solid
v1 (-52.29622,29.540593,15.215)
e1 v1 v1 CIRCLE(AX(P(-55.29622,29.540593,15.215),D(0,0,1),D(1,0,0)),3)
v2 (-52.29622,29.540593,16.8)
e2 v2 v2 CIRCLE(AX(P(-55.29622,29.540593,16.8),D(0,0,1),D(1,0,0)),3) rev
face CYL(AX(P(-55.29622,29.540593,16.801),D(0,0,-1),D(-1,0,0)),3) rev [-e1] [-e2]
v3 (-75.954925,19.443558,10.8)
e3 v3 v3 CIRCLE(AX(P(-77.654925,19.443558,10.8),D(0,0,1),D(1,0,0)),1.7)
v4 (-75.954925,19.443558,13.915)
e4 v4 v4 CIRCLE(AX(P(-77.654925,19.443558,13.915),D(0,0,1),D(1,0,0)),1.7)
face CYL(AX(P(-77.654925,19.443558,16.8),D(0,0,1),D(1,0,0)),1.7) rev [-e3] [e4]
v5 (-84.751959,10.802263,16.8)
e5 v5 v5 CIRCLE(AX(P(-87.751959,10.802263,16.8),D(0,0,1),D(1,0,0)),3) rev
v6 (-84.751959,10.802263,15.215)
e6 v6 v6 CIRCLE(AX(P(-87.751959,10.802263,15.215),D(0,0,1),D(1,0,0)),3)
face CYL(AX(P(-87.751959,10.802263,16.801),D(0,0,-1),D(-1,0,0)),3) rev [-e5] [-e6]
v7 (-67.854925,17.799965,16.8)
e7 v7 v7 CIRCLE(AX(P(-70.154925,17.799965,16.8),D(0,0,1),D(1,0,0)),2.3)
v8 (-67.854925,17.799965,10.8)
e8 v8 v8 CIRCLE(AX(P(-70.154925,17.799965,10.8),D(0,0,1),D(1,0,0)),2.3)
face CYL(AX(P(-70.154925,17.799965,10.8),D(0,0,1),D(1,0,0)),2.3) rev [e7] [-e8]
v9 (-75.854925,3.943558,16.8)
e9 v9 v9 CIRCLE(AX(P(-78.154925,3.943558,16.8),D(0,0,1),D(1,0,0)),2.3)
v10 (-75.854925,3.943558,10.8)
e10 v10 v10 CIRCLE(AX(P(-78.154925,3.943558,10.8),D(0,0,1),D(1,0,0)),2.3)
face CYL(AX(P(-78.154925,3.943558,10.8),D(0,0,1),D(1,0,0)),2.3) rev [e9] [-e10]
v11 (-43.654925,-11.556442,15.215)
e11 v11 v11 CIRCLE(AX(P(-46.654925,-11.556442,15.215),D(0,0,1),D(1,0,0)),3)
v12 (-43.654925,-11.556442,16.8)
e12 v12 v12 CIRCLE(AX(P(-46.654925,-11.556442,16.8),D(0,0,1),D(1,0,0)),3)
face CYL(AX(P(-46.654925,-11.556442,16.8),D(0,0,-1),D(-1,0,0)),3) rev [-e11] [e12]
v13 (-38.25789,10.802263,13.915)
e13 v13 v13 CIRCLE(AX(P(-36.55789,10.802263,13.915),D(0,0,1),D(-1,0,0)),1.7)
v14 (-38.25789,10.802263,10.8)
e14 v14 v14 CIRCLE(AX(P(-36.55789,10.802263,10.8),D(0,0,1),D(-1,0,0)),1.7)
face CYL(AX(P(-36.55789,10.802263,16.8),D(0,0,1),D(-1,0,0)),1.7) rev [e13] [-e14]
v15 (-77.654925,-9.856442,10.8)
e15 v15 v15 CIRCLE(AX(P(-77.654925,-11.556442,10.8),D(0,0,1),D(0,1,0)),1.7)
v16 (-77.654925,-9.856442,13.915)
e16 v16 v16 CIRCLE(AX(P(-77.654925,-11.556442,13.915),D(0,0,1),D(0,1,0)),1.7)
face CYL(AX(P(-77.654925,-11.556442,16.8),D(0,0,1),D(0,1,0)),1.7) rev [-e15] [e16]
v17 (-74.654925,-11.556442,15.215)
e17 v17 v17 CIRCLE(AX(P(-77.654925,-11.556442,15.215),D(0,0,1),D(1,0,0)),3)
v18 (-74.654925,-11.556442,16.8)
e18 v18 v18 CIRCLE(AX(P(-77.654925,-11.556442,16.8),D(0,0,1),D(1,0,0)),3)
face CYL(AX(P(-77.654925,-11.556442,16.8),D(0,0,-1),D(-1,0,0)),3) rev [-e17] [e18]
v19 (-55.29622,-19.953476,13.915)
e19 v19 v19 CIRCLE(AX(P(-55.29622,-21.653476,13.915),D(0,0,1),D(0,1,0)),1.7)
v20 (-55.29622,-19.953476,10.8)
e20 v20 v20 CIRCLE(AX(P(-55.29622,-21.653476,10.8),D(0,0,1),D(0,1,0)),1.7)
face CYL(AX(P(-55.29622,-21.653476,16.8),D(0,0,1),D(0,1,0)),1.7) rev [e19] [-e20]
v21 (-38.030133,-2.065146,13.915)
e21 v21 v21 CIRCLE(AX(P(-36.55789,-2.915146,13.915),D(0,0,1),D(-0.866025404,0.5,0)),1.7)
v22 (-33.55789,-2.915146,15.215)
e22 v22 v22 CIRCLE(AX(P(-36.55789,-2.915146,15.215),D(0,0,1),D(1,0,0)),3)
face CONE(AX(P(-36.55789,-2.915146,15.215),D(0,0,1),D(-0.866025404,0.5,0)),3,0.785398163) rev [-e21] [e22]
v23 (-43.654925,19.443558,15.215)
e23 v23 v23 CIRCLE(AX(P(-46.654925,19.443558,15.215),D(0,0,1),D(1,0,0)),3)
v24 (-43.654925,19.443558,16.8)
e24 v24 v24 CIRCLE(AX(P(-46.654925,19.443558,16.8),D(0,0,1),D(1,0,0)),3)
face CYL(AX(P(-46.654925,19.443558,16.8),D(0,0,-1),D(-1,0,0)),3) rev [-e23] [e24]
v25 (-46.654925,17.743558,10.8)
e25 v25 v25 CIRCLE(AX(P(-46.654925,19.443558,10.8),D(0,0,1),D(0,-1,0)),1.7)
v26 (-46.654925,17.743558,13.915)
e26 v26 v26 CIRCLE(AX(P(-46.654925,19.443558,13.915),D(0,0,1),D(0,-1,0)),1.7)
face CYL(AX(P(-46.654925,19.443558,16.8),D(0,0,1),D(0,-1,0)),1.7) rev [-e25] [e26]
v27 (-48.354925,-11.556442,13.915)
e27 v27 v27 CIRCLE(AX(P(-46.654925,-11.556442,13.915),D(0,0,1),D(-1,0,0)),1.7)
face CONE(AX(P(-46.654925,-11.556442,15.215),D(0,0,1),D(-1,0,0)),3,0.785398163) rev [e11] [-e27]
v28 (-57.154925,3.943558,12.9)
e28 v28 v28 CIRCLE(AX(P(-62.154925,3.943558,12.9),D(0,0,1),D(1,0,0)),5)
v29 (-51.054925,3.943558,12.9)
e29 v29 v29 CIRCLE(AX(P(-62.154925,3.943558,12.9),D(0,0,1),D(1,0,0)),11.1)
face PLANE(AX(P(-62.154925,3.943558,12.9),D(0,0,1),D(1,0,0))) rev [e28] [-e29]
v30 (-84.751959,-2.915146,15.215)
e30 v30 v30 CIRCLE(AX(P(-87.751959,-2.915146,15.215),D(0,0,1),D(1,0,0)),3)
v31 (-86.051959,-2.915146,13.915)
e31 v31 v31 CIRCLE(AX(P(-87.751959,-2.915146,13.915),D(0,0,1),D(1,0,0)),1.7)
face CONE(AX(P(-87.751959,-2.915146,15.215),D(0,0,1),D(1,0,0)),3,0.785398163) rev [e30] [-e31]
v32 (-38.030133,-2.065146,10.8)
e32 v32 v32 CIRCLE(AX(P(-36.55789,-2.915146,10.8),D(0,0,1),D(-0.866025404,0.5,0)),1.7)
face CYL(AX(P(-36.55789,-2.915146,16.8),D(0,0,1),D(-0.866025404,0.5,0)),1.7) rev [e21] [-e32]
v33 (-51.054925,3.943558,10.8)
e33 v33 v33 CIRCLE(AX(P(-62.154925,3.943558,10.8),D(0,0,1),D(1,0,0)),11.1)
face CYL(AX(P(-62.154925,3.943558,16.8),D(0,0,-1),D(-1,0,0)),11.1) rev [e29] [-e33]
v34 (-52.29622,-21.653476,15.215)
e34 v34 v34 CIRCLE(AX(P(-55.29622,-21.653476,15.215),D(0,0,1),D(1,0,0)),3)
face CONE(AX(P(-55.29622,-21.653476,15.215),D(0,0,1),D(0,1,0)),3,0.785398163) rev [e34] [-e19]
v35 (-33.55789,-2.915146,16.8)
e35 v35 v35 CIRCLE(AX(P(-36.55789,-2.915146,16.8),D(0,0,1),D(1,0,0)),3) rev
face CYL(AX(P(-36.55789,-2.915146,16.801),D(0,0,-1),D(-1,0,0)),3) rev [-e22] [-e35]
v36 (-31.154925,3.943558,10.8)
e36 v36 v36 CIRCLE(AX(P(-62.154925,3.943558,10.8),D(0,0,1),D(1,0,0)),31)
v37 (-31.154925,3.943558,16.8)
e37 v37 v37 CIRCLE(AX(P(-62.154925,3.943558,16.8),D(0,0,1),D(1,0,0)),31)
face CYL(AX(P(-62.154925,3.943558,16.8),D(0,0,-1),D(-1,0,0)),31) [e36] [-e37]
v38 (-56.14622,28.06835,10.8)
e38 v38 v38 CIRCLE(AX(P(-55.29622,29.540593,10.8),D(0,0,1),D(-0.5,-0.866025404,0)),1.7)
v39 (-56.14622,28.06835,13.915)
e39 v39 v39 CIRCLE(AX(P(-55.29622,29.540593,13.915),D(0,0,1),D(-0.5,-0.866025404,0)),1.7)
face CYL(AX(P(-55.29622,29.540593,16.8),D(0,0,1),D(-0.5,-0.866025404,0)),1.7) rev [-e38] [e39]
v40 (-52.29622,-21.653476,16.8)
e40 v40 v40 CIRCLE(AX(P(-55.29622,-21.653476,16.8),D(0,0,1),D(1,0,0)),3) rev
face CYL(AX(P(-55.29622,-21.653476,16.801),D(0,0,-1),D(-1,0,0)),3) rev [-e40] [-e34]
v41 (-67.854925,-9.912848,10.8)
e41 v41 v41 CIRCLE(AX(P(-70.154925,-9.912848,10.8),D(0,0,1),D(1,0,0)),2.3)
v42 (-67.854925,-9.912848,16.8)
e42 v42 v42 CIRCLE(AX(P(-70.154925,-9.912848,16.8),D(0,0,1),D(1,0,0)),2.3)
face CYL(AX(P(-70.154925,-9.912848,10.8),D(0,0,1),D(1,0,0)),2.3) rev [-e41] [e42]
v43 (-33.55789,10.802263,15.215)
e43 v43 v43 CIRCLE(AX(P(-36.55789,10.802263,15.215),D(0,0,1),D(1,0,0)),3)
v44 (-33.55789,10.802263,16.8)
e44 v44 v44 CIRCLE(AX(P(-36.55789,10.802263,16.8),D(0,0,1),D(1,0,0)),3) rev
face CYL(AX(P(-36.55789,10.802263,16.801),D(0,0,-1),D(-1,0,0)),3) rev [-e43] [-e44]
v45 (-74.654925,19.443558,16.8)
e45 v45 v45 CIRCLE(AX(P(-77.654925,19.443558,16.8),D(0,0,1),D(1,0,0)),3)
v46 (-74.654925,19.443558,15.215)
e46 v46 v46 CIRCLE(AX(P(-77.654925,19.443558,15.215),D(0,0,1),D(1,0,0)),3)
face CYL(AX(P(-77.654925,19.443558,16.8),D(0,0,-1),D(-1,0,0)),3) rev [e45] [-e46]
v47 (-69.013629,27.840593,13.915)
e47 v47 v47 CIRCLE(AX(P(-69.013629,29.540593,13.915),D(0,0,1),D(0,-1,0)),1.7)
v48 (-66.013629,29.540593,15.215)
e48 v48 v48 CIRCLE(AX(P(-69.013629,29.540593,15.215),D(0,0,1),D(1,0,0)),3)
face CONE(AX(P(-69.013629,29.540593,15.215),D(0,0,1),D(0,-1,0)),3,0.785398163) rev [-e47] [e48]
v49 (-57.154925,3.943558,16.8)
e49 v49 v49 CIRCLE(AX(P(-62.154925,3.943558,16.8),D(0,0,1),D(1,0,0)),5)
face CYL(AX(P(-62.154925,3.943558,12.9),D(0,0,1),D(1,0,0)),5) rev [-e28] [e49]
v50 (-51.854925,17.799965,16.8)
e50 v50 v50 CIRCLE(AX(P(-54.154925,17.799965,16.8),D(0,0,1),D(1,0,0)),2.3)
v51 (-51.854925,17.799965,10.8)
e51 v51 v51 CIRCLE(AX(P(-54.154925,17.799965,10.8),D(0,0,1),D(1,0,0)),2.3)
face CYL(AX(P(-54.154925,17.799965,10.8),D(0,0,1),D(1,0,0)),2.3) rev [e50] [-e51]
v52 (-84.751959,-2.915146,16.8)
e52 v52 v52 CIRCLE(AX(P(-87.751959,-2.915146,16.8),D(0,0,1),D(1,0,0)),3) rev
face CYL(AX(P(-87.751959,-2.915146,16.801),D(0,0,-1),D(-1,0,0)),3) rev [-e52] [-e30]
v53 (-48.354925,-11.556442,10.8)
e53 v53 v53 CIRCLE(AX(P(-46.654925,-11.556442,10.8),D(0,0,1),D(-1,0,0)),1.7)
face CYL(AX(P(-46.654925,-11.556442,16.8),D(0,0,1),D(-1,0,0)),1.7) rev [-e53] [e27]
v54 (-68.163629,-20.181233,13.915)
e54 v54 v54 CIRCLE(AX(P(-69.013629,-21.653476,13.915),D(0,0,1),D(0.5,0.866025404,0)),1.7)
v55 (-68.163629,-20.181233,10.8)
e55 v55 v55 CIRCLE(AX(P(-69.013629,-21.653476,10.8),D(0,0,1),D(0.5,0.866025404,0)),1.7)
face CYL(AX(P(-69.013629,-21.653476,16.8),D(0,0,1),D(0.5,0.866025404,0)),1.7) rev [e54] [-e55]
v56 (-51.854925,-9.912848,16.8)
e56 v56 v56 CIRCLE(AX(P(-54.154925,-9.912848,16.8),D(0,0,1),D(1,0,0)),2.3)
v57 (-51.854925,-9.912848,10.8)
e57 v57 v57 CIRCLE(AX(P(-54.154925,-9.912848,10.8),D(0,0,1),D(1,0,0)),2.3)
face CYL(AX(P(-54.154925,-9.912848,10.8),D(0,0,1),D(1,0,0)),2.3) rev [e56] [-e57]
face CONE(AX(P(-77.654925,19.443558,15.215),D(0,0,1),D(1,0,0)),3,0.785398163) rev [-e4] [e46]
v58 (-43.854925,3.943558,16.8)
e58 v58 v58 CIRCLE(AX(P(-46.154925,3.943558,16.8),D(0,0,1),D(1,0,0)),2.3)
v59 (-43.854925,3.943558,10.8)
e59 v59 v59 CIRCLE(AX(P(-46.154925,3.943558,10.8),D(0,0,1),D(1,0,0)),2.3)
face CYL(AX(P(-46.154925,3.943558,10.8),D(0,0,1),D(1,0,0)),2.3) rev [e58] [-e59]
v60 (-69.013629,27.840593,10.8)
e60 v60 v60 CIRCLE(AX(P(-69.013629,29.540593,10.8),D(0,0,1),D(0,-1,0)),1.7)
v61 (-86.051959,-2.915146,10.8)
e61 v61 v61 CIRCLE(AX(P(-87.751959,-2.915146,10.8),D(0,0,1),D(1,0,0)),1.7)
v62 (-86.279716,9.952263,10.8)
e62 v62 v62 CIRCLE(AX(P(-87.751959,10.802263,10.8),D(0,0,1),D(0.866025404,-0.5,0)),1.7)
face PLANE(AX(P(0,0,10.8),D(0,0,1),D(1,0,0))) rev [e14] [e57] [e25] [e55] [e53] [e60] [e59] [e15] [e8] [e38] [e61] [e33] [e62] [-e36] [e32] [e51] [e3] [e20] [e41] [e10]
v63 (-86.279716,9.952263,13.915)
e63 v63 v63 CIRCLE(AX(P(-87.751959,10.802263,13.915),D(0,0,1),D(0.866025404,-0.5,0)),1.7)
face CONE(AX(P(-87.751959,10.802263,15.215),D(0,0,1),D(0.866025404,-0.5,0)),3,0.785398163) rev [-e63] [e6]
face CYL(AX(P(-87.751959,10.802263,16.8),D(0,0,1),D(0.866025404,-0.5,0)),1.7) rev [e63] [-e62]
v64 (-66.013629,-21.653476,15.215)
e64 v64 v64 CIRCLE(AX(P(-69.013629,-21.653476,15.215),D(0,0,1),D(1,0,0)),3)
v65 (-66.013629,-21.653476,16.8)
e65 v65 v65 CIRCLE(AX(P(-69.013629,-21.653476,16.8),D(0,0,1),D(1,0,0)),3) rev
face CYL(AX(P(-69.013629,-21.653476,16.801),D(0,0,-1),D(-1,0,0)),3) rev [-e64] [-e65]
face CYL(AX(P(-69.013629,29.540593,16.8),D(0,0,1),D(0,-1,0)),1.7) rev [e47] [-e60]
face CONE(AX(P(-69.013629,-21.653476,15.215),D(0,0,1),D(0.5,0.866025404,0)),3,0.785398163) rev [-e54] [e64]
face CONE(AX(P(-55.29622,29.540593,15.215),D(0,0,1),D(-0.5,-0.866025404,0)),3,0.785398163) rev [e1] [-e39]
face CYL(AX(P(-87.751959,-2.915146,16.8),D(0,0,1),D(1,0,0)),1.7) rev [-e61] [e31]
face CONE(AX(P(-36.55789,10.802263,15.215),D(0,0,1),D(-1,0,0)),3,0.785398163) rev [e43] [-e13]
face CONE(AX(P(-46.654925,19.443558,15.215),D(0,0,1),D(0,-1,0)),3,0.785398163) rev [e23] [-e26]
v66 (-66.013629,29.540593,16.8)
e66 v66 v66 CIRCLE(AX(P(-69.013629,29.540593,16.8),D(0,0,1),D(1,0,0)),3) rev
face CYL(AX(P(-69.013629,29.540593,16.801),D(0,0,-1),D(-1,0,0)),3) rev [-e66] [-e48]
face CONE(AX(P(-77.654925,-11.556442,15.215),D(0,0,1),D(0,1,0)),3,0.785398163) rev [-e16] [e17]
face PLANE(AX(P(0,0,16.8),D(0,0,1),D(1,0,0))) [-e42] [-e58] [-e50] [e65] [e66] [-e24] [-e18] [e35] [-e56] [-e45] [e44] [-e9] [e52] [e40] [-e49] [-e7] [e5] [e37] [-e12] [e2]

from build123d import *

# Parameters (mm, degrees)
SKETCH2_R           = 31
SKETCH2_R_2         = 11.1
SKETCH2_R_3         = 3
BOSS_EXTRUDE1_DEPTH = 6
BOSS_EXTRUDE3_START = -3.9
SKETCH4_R           = 11.1
SKETCH4_R_2         = 5
BOSS_EXTRUDE3_DEPTH = 3.9
SKETCH5_R           = 2.3
CUT_EXTRUDE1_DEPTH  = 6
CIRPATTERN3_COUNT   = 4
CUT_EXTRUDE2_REACH  = 101.674
SKETCH12_R          = 3
CIRPATTERN4_COUNT   = 2
CIRPATTERN4_ANGLE   = 60
CIRPATTERN5_COUNT   = 4


# Read off the part's stored shape, not the designer's step: Revolve1
with BuildPart() as part:
    # Sketch2 → Boss-Extrude1 (new body)
    with BuildSketch(Plane(origin=(-62.154924708, 3.943558292, 10.8), x_dir=(1, 0, 0), z_dir=(0, 0, 1))):
        Circle(SKETCH2_R)
        Circle(SKETCH2_R_2, mode=Mode.SUBTRACT)
        with Locations((-15.5, 15.5)):
            Circle(SKETCH2_R_3, mode=Mode.SUBTRACT)
        with Locations((15.5, 15.5)):
            Circle(SKETCH2_R_3, mode=Mode.SUBTRACT)
        with Locations((15.5, -15.5)):
            Circle(SKETCH2_R_3, mode=Mode.SUBTRACT)
        with Locations((-15.5, -15.5)):
            Circle(SKETCH2_R_3, mode=Mode.SUBTRACT)
    extrude(amount=BOSS_EXTRUDE1_DEPTH)

    # Sketch4 → Boss-Extrude3 (add)
    with BuildSketch(Plane(origin=(-62.154924708, 3.943558292, 16.8), x_dir=(1, 0, 0), z_dir=(0, 0, 1)).offset(BOSS_EXTRUDE3_START)):
        Circle(SKETCH4_R)
        Circle(SKETCH4_R_2, mode=Mode.SUBTRACT)
    extrude(amount=BOSS_EXTRUDE3_DEPTH)

    # Sketch5 → Cut-Extrude1 (cut)
    with BuildSketch(Plane.XY.offset(16.8)):
        with Locations((-46.154924708, 3.943558292)):
            Circle(SKETCH5_R)
        with Locations((-54.154924708, -9.912848169)):
            Circle(SKETCH5_R)
        with Locations((-70.154924708, -9.912848169)):
            Circle(SKETCH5_R)
        with Locations((-78.154924708, 3.943558292)):
            Circle(SKETCH5_R)
        with Locations((-70.154924708, 17.799964752)):
            Circle(SKETCH5_R)
        with Locations((-54.154924708, 17.799964752)):
            Circle(SKETCH5_R)
    extrude(amount=-CUT_EXTRUDE1_DEPTH, mode=Mode.SUBTRACT)

    # Revolve1 outline → Revolve1 (revolve)
    with BuildSketch(Plane(origin=(-77.654924708, 19.443558292, 0), x_dir=(1, 0, 0), z_dir=(0, -1, 0))):
        Polygon((1.7, 13.915), (1.7, 10.8), (3, 10.8), (3, 15.215), align=None)
    revolve1 = revolve(axis=Axis((-77.654924708, 19.443558292, 0), (0, 0, 1)))

    # CirPattern3: Revolve1 ×4 about axis
    cirpattern3_axis = Axis((-62.154924708, 3.943558292, 0), (0, 0, 1))
    for i in range(1, CIRPATTERN3_COUNT):
        add(revolve1.rotate(cirpattern3_axis, i * 360 / CIRPATTERN3_COUNT))

    # Sketch12 → Cut-Extrude2 (cut, up to next)
    with BuildSketch(Plane(origin=(0, 0, 10.8), x_dir=(-1, 0, 0), z_dir=(0, 0, -1)), mode=Mode.PRIVATE) as cut_extrude2_sk1:
        with Locations((69.013629403, -21.653476105)):
            Circle(SKETCH12_R)
    cut_extrude2_tool1 = extrude(cut_extrude2_sk1.sketch, amount=-CUT_EXTRUDE2_REACH, mode=Mode.PRIVATE) & part.part
    # Sketch12 → Cut-Extrude2 (cut, up to next)
    with BuildSketch(Plane(origin=(0, 0, 10.8), x_dir=(-1, 0, 0), z_dir=(0, 0, -1)), mode=Mode.PRIVATE) as cut_extrude2_sk2:
        with Locations(Location((55.296220013, -21.653476105, 0), (0, 0, 180))):
            Circle(SKETCH12_R)
    cut_extrude2_tool2 = extrude(cut_extrude2_sk2.sketch, amount=-CUT_EXTRUDE2_REACH, mode=Mode.PRIVATE) & part.part
    # Sketch12 → Cut-Extrude2 (cut, up to next)
    with BuildSketch(Plane(origin=(0, 0, 10.8), x_dir=(-1, 0, 0), z_dir=(0, 0, -1)), mode=Mode.PRIVATE) as cut_extrude2_sk3:
        with Locations(Location((36.557890311, 10.802262987, 0), (0, 0, 180))):
            Circle(SKETCH12_R)
    cut_extrude2_tool3 = extrude(cut_extrude2_sk3.sketch, amount=-CUT_EXTRUDE2_REACH, mode=Mode.PRIVATE) & part.part
    # Sketch12 → Cut-Extrude2 (cut, up to next)
    with BuildSketch(Plane(origin=(0, 0, 10.8), x_dir=(-1, 0, 0), z_dir=(0, 0, -1)), mode=Mode.PRIVATE) as cut_extrude2_sk4:
        with Locations((36.557890311, -2.915146404)):
            Circle(SKETCH12_R)
    cut_extrude2_tool4 = extrude(cut_extrude2_sk4.sketch, amount=-CUT_EXTRUDE2_REACH, mode=Mode.PRIVATE) & part.part
    # Sketch12 → Cut-Extrude2 (cut, up to next)
    with BuildSketch(Plane(origin=(0, 0, 10.8), x_dir=(-1, 0, 0), z_dir=(0, 0, -1)), mode=Mode.PRIVATE) as cut_extrude2_sk5:
        with Locations(Location((69.013629403, 29.540592688, 0), (0, 0, 180))):
            Circle(SKETCH12_R)
    cut_extrude2_tool5 = extrude(cut_extrude2_sk5.sketch, amount=-CUT_EXTRUDE2_REACH, mode=Mode.PRIVATE) & part.part
    # Sketch12 → Cut-Extrude2 (cut, up to next)
    with BuildSketch(Plane(origin=(0, 0, 10.8), x_dir=(-1, 0, 0), z_dir=(0, 0, -1)), mode=Mode.PRIVATE) as cut_extrude2_sk6:
        with Locations((55.296220013, 29.540592688)):
            Circle(SKETCH12_R)
    cut_extrude2_tool6 = extrude(cut_extrude2_sk6.sketch, amount=-CUT_EXTRUDE2_REACH, mode=Mode.PRIVATE) & part.part
    # Sketch12 → Cut-Extrude2 (cut, up to next)
    with BuildSketch(Plane(origin=(0, 0, 10.8), x_dir=(-1, 0, 0), z_dir=(0, 0, -1)), mode=Mode.PRIVATE) as cut_extrude2_sk7:
        with Locations(Location((87.751959105, -2.915146404, 0), (0, 0, 180))):
            Circle(SKETCH12_R)
    cut_extrude2_tool7 = extrude(cut_extrude2_sk7.sketch, amount=-CUT_EXTRUDE2_REACH, mode=Mode.PRIVATE) & part.part
    # Sketch12 → Cut-Extrude2 (cut, up to next)
    with BuildSketch(Plane(origin=(0, 0, 10.8), x_dir=(-1, 0, 0), z_dir=(0, 0, -1)), mode=Mode.PRIVATE) as cut_extrude2_sk8:
        with Locations((87.751959105, 10.802262987)):
            Circle(SKETCH12_R)
    cut_extrude2_tool8 = extrude(cut_extrude2_sk8.sketch, amount=-CUT_EXTRUDE2_REACH, mode=Mode.PRIVATE) & part.part
    add(cut_extrude2_tool1.solids().sort_by_distance((-69.013629, -21.653476, 10.8))[0], mode=Mode.SUBTRACT)
    add(cut_extrude2_tool2.solids().sort_by_distance((-55.29622, -21.653476, 10.8))[0], mode=Mode.SUBTRACT)
    add(cut_extrude2_tool3.solids().sort_by_distance((-36.55789, 10.802263, 10.8))[0], mode=Mode.SUBTRACT)
    add(cut_extrude2_tool4.solids().sort_by_distance((-36.55789, -2.915146, 10.8))[0], mode=Mode.SUBTRACT)
    add(cut_extrude2_tool5.solids().sort_by_distance((-69.013629, 29.540593, 10.8))[0], mode=Mode.SUBTRACT)
    add(cut_extrude2_tool6.solids().sort_by_distance((-55.29622, 29.540593, 10.8))[0], mode=Mode.SUBTRACT)
    add(cut_extrude2_tool7.solids().sort_by_distance((-87.751959, -2.915146, 10.8))[0], mode=Mode.SUBTRACT)
    add(cut_extrude2_tool8.solids().sort_by_distance((-87.751959, 10.802263, 10.8))[0], mode=Mode.SUBTRACT)

    # Sketch18 → Revolve2 (revolve)
    with BuildSketch(Plane(origin=(-5.149480043, 19.218121154, 0), x_dir=(-0.9659258262890653, -0.25881904510253195, 0), z_dir=(0.25881904510253195, -0.9659258262890653, 0)), mode=Mode.PRIVATE) as revolve2_sk:
        Polygon((82.516379015, -10.8), (82.516379015, -15.215), (83.816379015, -13.915), (83.816379015, -10.8), align=None)
    revolve2 = revolve(revolve2_sk.sketch.rotate(Axis((-87.751959105, -2.915146404, 16.8), (0, 0, -1)), 15), axis=Axis((-87.751959105, -2.915146404, 16.8), (0, 0, -1)))

    # CirPattern4: Revolve2 ×2 about axis
    cirpattern4_axis = Axis((-62.154924708, 3.943558292, 0), (0, 0, 1))
    for i in range(1, CIRPATTERN4_COUNT):
        add(revolve2.rotate(cirpattern4_axis, i * CIRPATTERN4_ANGLE / (CIRPATTERN4_COUNT - 1)))

    # CirPattern5: Revolve2 ×4 about axis
    cirpattern5_axis = Axis((-62.154924708, 3.943558292, 0), (0, 0, -1))
    for i in range(1, CIRPATTERN5_COUNT):
        add(revolve2.rotate(cirpattern5_axis, i * 360 / CIRPATTERN5_COUNT))

    # CirPattern5 copy 1 sketch → CirPattern5 copy 1 (revolve)
    with BuildSketch(Plane(origin=(-5.149480043, -11.33100457, 0), x_dir=(-0.965925826289072, 0.2588190451025073, 0), z_dir=(-0.2588190451025073, -0.965925826289072, 0))):
        Polygon((82.516379015, -10.8), (82.516379015, -15.215), (83.816379015, -13.915), (83.816379015, -10.8), align=None)
    revolve(axis=Axis((-87.751959105, 10.802262987, 16.8), (0, 0, -1)))

    # CirPattern5 copy 2 sketch → CirPattern5 copy 2 (revolve)
    with BuildSketch(Plane(origin=(-77.42948757, -53.061886373, 0), x_dir=(0.2588190451025072, 0.965925826289072, 0), z_dir=(-0.965925826289072, 0.2588190451025072, 0))):
        Polygon((82.516379015, -10.8), (82.516379015, -15.215), (83.816379015, -13.915), (83.816379015, -10.8), align=None)
    revolve(axis=Axis((-55.296220013, 29.540592689, 16.8), (0, 0, -1)))

    # CirPattern5 copy 3 sketch → CirPattern5 copy 3 (revolve)
    with BuildSketch(Plane(origin=(-119.160369373, 19.218121154, 0), x_dir=(0.965925826289072, -0.25881904510250714, 0), z_dir=(0.25881904510250714, 0.965925826289072, 0))):
        Polygon((82.516379015, -10.8), (82.516379015, -15.215), (83.816379015, -13.915), (83.816379015, -10.8), align=None)
    revolve(axis=Axis((-36.557890311, -2.915146403, 16.8), (0, 0, -1)))


solid = part.part
